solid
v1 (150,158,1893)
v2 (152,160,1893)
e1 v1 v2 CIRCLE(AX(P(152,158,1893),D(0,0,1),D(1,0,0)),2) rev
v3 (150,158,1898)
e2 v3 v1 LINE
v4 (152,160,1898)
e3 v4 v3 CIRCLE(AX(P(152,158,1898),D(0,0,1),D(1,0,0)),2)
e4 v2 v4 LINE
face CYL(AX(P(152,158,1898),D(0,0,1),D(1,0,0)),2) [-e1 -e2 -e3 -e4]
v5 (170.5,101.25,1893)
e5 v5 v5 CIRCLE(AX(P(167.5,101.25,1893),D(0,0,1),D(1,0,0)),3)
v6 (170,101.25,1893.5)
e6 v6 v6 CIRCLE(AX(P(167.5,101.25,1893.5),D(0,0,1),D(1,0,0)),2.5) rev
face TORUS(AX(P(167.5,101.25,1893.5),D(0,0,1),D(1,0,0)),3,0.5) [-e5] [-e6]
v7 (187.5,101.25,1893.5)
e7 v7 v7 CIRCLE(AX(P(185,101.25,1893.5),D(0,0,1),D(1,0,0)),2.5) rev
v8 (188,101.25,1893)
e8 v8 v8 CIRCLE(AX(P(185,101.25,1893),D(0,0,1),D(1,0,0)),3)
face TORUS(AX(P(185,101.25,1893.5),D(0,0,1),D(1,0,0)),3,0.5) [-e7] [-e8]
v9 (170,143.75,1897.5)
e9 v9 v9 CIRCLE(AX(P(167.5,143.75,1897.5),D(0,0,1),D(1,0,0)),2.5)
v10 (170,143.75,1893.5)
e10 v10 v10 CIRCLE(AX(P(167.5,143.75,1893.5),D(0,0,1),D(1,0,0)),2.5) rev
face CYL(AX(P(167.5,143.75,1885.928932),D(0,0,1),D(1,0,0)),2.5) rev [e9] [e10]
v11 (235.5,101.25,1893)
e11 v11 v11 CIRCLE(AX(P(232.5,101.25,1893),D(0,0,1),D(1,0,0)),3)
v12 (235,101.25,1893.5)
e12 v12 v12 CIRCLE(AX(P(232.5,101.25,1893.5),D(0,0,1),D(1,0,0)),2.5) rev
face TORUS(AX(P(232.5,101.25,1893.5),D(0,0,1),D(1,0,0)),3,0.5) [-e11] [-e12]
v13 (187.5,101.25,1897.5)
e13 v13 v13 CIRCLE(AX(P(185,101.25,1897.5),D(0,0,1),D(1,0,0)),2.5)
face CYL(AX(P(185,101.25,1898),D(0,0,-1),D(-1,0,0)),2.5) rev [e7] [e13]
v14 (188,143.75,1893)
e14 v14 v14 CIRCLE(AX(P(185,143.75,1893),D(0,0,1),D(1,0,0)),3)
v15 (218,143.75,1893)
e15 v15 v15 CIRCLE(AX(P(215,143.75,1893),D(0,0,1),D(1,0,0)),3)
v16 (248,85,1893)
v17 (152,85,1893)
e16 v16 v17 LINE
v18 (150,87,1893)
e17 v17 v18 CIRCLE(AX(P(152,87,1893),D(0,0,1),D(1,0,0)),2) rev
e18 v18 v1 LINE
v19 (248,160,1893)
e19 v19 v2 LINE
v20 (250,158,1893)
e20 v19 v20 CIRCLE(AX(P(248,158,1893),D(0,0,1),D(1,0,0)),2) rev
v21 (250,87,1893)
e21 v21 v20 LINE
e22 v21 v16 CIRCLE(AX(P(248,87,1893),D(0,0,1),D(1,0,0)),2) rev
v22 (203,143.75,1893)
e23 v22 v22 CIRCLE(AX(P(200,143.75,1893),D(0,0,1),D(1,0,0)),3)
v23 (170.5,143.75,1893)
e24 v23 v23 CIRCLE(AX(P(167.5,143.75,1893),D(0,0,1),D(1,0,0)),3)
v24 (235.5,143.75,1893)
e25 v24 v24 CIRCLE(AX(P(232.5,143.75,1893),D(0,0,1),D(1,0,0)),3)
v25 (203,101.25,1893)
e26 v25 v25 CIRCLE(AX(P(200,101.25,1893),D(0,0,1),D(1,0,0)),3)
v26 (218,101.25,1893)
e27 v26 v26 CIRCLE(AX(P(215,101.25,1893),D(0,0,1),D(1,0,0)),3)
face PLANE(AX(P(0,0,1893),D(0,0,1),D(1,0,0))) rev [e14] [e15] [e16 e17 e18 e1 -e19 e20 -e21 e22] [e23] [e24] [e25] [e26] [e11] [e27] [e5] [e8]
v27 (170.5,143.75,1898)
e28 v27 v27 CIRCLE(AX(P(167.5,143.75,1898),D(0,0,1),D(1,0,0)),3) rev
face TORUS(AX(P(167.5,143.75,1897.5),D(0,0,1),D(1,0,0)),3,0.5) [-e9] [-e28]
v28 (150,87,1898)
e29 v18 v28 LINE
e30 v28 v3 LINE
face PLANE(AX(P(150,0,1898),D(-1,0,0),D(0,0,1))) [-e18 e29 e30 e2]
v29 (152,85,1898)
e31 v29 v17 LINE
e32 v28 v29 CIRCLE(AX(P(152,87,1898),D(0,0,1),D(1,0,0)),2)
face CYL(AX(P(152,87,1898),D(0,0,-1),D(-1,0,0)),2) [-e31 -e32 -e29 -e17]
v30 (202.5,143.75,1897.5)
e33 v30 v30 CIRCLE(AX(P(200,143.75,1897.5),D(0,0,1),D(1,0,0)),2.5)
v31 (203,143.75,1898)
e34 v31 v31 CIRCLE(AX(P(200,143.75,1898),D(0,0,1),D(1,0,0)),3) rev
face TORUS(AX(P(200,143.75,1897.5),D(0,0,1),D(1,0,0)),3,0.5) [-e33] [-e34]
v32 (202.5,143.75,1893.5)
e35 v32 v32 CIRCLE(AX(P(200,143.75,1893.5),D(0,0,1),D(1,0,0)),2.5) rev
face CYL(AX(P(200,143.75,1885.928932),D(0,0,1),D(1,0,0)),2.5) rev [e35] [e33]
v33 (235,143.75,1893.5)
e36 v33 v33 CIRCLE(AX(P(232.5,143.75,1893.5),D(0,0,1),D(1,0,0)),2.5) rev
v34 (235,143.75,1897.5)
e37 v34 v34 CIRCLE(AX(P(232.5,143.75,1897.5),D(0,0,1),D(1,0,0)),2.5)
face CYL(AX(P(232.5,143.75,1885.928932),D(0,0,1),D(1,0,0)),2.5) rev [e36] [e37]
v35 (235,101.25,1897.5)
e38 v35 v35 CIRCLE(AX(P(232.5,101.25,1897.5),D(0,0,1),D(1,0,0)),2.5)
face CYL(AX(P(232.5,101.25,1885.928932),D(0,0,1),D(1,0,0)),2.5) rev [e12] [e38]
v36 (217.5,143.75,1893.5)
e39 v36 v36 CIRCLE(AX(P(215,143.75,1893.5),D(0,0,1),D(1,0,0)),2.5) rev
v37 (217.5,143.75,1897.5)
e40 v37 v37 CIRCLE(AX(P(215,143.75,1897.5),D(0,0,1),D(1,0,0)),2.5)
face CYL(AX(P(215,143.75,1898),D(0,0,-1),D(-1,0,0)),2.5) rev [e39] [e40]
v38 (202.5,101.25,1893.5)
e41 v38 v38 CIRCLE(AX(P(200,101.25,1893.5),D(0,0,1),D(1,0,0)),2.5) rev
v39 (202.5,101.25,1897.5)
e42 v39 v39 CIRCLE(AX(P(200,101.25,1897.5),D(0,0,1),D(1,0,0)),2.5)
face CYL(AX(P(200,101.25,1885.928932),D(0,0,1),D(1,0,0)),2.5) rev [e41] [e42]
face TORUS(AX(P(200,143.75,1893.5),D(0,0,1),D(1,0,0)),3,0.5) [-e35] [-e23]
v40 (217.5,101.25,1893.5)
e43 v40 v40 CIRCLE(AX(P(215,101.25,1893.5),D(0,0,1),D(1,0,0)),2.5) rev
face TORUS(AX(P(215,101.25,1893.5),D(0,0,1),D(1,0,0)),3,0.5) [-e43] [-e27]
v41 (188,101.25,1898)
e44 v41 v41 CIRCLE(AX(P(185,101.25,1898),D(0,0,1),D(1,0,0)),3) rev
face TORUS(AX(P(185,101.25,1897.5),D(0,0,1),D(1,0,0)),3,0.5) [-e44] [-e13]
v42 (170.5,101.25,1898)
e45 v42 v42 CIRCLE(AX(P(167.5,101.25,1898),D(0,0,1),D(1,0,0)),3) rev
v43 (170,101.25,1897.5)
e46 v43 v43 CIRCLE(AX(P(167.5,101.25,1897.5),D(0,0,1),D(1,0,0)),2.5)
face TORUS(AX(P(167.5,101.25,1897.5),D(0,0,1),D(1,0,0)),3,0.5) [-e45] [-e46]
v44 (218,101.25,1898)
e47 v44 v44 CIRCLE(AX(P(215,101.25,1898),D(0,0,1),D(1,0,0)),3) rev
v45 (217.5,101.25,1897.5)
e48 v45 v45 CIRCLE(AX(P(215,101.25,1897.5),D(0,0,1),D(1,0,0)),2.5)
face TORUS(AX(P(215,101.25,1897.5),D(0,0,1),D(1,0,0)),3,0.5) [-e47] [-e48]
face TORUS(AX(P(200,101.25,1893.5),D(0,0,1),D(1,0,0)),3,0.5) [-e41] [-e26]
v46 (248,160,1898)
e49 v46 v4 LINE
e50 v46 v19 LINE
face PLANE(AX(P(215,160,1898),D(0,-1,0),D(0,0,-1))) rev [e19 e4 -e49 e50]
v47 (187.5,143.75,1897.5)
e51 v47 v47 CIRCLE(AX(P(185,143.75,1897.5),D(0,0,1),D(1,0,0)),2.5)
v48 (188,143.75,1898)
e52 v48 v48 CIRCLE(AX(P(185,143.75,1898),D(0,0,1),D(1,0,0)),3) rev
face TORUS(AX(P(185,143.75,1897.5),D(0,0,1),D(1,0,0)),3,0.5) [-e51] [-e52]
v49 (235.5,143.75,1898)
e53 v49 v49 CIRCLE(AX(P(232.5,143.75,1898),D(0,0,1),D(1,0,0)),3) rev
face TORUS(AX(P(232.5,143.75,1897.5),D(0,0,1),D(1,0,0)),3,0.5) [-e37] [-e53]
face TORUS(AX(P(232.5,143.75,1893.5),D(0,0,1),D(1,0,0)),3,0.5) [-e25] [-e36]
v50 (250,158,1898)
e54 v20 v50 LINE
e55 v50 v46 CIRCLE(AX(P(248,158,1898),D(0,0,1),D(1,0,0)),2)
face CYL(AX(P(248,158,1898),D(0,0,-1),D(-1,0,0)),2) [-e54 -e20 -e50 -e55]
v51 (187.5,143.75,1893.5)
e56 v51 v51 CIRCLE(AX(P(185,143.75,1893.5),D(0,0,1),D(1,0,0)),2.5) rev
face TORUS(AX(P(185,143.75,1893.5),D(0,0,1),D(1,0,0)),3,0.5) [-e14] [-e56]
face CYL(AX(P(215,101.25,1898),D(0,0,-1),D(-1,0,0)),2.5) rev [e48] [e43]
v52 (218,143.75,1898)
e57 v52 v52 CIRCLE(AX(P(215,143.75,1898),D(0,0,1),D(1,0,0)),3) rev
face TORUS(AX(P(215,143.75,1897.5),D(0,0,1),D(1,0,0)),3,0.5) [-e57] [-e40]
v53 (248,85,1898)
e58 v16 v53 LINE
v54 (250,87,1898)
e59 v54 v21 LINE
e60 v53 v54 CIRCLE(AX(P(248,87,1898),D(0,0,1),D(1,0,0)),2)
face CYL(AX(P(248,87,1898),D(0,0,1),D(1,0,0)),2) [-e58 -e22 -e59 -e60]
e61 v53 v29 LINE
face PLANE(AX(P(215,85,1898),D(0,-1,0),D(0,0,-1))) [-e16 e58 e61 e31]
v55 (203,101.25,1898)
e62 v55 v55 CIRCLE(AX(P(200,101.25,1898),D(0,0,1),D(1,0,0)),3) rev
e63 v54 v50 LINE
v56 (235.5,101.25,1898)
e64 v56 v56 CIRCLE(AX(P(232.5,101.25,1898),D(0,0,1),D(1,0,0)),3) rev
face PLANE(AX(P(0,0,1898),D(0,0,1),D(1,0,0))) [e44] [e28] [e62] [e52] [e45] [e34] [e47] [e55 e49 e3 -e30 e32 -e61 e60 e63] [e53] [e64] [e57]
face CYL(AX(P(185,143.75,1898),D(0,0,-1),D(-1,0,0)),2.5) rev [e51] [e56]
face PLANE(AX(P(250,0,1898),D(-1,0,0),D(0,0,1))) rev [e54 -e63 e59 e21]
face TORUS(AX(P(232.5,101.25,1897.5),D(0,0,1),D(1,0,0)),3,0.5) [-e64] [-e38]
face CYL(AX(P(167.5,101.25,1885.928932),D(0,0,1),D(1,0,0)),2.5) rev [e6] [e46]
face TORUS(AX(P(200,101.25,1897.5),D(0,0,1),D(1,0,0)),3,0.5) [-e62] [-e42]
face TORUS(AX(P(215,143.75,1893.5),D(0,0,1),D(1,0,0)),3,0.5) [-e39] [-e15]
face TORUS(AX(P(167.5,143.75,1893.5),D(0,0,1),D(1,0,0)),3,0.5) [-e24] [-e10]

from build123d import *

# Parameters (mm, degrees)
STOCK_MASTER_BODY_001_1_START     = 1893
STOCK_MASTER_BODY_001_1_OUTLINE_W = 100
STOCK_MASTER_BODY_001_1_OUTLINE_H = 75
STOCK_MASTER_BODY_001_1_OUTLINE_R = 2.5
STOCK_MASTER_BODY_001_1_DEPTH     = 5
FILLET1_R                         = 2
FILLET2_R                         = 0.5


# Read off the part's stored shape, not the designer's step: Stock-master_body_001-1
with BuildPart() as part:
    # Stock-master_body_001-1 outline → Stock-master_body_001-1 (new body)
    with BuildSketch(Plane.XY.offset(STOCK_MASTER_BODY_001_1_START)):
        with Locations((200, 122.5)):
            Rectangle(STOCK_MASTER_BODY_001_1_OUTLINE_W, STOCK_MASTER_BODY_001_1_OUTLINE_H)
        with Locations((167.5, 101.25)):
            Circle(STOCK_MASTER_BODY_001_1_OUTLINE_R, mode=Mode.SUBTRACT)
        with Locations((185, 101.25)):
            Circle(STOCK_MASTER_BODY_001_1_OUTLINE_R, mode=Mode.SUBTRACT)
        with Locations((200, 101.25)):
            Circle(STOCK_MASTER_BODY_001_1_OUTLINE_R, mode=Mode.SUBTRACT)
        with Locations((215, 101.25)):
            Circle(STOCK_MASTER_BODY_001_1_OUTLINE_R, mode=Mode.SUBTRACT)
        with Locations((232.5, 101.25)):
            Circle(STOCK_MASTER_BODY_001_1_OUTLINE_R, mode=Mode.SUBTRACT)
        with Locations((167.5, 143.75)):
            Circle(STOCK_MASTER_BODY_001_1_OUTLINE_R, mode=Mode.SUBTRACT)
        with Locations((185, 143.75)):
            Circle(STOCK_MASTER_BODY_001_1_OUTLINE_R, mode=Mode.SUBTRACT)
        with Locations((200, 143.75)):
            Circle(STOCK_MASTER_BODY_001_1_OUTLINE_R, mode=Mode.SUBTRACT)
        with Locations((215, 143.75)):
            Circle(STOCK_MASTER_BODY_001_1_OUTLINE_R, mode=Mode.SUBTRACT)
        with Locations((232.5, 143.75)):
            Circle(STOCK_MASTER_BODY_001_1_OUTLINE_R, mode=Mode.SUBTRACT)
    extrude(amount=STOCK_MASTER_BODY_001_1_DEPTH)

    # Fillet1
    fillet1_edges = [part.edges().sort_by_distance(p)[0] for p in [
        (250, 85, 1895.5),
        (150, 85, 1895.5),
        (150, 160, 1895.5),
        (250, 160, 1895.5),
    ]]
    fillet(fillet1_edges, radius=FILLET1_R)

    # Fillet2
    fillet2_edges = [part.edges().sort_by_distance(p)[0] for p in [
        (212.5, 143.75, 1898),
        (212.5, 143.75, 1893),
        (182.5, 143.75, 1898),
        (182.5, 143.75, 1893),
        (182.5, 101.25, 1898),
        (182.5, 101.25, 1893),
        (212.5, 101.25, 1898),
        (212.5, 101.25, 1893),
        (230, 143.75, 1898),
        (230, 143.75, 1893),
        (165, 143.75, 1898),
        (165, 143.75, 1893),
        (165, 101.25, 1898),
        (165, 101.25, 1893),
        (197.5, 143.75, 1898),
        (197.5, 143.75, 1893),
        (230, 101.25, 1898),
        (230, 101.25, 1893),
        (197.5, 101.25, 1898),
        (197.5, 101.25, 1893),
    ]]
    fillet(fillet2_edges, radius=FILLET2_R)


solid = part.part
